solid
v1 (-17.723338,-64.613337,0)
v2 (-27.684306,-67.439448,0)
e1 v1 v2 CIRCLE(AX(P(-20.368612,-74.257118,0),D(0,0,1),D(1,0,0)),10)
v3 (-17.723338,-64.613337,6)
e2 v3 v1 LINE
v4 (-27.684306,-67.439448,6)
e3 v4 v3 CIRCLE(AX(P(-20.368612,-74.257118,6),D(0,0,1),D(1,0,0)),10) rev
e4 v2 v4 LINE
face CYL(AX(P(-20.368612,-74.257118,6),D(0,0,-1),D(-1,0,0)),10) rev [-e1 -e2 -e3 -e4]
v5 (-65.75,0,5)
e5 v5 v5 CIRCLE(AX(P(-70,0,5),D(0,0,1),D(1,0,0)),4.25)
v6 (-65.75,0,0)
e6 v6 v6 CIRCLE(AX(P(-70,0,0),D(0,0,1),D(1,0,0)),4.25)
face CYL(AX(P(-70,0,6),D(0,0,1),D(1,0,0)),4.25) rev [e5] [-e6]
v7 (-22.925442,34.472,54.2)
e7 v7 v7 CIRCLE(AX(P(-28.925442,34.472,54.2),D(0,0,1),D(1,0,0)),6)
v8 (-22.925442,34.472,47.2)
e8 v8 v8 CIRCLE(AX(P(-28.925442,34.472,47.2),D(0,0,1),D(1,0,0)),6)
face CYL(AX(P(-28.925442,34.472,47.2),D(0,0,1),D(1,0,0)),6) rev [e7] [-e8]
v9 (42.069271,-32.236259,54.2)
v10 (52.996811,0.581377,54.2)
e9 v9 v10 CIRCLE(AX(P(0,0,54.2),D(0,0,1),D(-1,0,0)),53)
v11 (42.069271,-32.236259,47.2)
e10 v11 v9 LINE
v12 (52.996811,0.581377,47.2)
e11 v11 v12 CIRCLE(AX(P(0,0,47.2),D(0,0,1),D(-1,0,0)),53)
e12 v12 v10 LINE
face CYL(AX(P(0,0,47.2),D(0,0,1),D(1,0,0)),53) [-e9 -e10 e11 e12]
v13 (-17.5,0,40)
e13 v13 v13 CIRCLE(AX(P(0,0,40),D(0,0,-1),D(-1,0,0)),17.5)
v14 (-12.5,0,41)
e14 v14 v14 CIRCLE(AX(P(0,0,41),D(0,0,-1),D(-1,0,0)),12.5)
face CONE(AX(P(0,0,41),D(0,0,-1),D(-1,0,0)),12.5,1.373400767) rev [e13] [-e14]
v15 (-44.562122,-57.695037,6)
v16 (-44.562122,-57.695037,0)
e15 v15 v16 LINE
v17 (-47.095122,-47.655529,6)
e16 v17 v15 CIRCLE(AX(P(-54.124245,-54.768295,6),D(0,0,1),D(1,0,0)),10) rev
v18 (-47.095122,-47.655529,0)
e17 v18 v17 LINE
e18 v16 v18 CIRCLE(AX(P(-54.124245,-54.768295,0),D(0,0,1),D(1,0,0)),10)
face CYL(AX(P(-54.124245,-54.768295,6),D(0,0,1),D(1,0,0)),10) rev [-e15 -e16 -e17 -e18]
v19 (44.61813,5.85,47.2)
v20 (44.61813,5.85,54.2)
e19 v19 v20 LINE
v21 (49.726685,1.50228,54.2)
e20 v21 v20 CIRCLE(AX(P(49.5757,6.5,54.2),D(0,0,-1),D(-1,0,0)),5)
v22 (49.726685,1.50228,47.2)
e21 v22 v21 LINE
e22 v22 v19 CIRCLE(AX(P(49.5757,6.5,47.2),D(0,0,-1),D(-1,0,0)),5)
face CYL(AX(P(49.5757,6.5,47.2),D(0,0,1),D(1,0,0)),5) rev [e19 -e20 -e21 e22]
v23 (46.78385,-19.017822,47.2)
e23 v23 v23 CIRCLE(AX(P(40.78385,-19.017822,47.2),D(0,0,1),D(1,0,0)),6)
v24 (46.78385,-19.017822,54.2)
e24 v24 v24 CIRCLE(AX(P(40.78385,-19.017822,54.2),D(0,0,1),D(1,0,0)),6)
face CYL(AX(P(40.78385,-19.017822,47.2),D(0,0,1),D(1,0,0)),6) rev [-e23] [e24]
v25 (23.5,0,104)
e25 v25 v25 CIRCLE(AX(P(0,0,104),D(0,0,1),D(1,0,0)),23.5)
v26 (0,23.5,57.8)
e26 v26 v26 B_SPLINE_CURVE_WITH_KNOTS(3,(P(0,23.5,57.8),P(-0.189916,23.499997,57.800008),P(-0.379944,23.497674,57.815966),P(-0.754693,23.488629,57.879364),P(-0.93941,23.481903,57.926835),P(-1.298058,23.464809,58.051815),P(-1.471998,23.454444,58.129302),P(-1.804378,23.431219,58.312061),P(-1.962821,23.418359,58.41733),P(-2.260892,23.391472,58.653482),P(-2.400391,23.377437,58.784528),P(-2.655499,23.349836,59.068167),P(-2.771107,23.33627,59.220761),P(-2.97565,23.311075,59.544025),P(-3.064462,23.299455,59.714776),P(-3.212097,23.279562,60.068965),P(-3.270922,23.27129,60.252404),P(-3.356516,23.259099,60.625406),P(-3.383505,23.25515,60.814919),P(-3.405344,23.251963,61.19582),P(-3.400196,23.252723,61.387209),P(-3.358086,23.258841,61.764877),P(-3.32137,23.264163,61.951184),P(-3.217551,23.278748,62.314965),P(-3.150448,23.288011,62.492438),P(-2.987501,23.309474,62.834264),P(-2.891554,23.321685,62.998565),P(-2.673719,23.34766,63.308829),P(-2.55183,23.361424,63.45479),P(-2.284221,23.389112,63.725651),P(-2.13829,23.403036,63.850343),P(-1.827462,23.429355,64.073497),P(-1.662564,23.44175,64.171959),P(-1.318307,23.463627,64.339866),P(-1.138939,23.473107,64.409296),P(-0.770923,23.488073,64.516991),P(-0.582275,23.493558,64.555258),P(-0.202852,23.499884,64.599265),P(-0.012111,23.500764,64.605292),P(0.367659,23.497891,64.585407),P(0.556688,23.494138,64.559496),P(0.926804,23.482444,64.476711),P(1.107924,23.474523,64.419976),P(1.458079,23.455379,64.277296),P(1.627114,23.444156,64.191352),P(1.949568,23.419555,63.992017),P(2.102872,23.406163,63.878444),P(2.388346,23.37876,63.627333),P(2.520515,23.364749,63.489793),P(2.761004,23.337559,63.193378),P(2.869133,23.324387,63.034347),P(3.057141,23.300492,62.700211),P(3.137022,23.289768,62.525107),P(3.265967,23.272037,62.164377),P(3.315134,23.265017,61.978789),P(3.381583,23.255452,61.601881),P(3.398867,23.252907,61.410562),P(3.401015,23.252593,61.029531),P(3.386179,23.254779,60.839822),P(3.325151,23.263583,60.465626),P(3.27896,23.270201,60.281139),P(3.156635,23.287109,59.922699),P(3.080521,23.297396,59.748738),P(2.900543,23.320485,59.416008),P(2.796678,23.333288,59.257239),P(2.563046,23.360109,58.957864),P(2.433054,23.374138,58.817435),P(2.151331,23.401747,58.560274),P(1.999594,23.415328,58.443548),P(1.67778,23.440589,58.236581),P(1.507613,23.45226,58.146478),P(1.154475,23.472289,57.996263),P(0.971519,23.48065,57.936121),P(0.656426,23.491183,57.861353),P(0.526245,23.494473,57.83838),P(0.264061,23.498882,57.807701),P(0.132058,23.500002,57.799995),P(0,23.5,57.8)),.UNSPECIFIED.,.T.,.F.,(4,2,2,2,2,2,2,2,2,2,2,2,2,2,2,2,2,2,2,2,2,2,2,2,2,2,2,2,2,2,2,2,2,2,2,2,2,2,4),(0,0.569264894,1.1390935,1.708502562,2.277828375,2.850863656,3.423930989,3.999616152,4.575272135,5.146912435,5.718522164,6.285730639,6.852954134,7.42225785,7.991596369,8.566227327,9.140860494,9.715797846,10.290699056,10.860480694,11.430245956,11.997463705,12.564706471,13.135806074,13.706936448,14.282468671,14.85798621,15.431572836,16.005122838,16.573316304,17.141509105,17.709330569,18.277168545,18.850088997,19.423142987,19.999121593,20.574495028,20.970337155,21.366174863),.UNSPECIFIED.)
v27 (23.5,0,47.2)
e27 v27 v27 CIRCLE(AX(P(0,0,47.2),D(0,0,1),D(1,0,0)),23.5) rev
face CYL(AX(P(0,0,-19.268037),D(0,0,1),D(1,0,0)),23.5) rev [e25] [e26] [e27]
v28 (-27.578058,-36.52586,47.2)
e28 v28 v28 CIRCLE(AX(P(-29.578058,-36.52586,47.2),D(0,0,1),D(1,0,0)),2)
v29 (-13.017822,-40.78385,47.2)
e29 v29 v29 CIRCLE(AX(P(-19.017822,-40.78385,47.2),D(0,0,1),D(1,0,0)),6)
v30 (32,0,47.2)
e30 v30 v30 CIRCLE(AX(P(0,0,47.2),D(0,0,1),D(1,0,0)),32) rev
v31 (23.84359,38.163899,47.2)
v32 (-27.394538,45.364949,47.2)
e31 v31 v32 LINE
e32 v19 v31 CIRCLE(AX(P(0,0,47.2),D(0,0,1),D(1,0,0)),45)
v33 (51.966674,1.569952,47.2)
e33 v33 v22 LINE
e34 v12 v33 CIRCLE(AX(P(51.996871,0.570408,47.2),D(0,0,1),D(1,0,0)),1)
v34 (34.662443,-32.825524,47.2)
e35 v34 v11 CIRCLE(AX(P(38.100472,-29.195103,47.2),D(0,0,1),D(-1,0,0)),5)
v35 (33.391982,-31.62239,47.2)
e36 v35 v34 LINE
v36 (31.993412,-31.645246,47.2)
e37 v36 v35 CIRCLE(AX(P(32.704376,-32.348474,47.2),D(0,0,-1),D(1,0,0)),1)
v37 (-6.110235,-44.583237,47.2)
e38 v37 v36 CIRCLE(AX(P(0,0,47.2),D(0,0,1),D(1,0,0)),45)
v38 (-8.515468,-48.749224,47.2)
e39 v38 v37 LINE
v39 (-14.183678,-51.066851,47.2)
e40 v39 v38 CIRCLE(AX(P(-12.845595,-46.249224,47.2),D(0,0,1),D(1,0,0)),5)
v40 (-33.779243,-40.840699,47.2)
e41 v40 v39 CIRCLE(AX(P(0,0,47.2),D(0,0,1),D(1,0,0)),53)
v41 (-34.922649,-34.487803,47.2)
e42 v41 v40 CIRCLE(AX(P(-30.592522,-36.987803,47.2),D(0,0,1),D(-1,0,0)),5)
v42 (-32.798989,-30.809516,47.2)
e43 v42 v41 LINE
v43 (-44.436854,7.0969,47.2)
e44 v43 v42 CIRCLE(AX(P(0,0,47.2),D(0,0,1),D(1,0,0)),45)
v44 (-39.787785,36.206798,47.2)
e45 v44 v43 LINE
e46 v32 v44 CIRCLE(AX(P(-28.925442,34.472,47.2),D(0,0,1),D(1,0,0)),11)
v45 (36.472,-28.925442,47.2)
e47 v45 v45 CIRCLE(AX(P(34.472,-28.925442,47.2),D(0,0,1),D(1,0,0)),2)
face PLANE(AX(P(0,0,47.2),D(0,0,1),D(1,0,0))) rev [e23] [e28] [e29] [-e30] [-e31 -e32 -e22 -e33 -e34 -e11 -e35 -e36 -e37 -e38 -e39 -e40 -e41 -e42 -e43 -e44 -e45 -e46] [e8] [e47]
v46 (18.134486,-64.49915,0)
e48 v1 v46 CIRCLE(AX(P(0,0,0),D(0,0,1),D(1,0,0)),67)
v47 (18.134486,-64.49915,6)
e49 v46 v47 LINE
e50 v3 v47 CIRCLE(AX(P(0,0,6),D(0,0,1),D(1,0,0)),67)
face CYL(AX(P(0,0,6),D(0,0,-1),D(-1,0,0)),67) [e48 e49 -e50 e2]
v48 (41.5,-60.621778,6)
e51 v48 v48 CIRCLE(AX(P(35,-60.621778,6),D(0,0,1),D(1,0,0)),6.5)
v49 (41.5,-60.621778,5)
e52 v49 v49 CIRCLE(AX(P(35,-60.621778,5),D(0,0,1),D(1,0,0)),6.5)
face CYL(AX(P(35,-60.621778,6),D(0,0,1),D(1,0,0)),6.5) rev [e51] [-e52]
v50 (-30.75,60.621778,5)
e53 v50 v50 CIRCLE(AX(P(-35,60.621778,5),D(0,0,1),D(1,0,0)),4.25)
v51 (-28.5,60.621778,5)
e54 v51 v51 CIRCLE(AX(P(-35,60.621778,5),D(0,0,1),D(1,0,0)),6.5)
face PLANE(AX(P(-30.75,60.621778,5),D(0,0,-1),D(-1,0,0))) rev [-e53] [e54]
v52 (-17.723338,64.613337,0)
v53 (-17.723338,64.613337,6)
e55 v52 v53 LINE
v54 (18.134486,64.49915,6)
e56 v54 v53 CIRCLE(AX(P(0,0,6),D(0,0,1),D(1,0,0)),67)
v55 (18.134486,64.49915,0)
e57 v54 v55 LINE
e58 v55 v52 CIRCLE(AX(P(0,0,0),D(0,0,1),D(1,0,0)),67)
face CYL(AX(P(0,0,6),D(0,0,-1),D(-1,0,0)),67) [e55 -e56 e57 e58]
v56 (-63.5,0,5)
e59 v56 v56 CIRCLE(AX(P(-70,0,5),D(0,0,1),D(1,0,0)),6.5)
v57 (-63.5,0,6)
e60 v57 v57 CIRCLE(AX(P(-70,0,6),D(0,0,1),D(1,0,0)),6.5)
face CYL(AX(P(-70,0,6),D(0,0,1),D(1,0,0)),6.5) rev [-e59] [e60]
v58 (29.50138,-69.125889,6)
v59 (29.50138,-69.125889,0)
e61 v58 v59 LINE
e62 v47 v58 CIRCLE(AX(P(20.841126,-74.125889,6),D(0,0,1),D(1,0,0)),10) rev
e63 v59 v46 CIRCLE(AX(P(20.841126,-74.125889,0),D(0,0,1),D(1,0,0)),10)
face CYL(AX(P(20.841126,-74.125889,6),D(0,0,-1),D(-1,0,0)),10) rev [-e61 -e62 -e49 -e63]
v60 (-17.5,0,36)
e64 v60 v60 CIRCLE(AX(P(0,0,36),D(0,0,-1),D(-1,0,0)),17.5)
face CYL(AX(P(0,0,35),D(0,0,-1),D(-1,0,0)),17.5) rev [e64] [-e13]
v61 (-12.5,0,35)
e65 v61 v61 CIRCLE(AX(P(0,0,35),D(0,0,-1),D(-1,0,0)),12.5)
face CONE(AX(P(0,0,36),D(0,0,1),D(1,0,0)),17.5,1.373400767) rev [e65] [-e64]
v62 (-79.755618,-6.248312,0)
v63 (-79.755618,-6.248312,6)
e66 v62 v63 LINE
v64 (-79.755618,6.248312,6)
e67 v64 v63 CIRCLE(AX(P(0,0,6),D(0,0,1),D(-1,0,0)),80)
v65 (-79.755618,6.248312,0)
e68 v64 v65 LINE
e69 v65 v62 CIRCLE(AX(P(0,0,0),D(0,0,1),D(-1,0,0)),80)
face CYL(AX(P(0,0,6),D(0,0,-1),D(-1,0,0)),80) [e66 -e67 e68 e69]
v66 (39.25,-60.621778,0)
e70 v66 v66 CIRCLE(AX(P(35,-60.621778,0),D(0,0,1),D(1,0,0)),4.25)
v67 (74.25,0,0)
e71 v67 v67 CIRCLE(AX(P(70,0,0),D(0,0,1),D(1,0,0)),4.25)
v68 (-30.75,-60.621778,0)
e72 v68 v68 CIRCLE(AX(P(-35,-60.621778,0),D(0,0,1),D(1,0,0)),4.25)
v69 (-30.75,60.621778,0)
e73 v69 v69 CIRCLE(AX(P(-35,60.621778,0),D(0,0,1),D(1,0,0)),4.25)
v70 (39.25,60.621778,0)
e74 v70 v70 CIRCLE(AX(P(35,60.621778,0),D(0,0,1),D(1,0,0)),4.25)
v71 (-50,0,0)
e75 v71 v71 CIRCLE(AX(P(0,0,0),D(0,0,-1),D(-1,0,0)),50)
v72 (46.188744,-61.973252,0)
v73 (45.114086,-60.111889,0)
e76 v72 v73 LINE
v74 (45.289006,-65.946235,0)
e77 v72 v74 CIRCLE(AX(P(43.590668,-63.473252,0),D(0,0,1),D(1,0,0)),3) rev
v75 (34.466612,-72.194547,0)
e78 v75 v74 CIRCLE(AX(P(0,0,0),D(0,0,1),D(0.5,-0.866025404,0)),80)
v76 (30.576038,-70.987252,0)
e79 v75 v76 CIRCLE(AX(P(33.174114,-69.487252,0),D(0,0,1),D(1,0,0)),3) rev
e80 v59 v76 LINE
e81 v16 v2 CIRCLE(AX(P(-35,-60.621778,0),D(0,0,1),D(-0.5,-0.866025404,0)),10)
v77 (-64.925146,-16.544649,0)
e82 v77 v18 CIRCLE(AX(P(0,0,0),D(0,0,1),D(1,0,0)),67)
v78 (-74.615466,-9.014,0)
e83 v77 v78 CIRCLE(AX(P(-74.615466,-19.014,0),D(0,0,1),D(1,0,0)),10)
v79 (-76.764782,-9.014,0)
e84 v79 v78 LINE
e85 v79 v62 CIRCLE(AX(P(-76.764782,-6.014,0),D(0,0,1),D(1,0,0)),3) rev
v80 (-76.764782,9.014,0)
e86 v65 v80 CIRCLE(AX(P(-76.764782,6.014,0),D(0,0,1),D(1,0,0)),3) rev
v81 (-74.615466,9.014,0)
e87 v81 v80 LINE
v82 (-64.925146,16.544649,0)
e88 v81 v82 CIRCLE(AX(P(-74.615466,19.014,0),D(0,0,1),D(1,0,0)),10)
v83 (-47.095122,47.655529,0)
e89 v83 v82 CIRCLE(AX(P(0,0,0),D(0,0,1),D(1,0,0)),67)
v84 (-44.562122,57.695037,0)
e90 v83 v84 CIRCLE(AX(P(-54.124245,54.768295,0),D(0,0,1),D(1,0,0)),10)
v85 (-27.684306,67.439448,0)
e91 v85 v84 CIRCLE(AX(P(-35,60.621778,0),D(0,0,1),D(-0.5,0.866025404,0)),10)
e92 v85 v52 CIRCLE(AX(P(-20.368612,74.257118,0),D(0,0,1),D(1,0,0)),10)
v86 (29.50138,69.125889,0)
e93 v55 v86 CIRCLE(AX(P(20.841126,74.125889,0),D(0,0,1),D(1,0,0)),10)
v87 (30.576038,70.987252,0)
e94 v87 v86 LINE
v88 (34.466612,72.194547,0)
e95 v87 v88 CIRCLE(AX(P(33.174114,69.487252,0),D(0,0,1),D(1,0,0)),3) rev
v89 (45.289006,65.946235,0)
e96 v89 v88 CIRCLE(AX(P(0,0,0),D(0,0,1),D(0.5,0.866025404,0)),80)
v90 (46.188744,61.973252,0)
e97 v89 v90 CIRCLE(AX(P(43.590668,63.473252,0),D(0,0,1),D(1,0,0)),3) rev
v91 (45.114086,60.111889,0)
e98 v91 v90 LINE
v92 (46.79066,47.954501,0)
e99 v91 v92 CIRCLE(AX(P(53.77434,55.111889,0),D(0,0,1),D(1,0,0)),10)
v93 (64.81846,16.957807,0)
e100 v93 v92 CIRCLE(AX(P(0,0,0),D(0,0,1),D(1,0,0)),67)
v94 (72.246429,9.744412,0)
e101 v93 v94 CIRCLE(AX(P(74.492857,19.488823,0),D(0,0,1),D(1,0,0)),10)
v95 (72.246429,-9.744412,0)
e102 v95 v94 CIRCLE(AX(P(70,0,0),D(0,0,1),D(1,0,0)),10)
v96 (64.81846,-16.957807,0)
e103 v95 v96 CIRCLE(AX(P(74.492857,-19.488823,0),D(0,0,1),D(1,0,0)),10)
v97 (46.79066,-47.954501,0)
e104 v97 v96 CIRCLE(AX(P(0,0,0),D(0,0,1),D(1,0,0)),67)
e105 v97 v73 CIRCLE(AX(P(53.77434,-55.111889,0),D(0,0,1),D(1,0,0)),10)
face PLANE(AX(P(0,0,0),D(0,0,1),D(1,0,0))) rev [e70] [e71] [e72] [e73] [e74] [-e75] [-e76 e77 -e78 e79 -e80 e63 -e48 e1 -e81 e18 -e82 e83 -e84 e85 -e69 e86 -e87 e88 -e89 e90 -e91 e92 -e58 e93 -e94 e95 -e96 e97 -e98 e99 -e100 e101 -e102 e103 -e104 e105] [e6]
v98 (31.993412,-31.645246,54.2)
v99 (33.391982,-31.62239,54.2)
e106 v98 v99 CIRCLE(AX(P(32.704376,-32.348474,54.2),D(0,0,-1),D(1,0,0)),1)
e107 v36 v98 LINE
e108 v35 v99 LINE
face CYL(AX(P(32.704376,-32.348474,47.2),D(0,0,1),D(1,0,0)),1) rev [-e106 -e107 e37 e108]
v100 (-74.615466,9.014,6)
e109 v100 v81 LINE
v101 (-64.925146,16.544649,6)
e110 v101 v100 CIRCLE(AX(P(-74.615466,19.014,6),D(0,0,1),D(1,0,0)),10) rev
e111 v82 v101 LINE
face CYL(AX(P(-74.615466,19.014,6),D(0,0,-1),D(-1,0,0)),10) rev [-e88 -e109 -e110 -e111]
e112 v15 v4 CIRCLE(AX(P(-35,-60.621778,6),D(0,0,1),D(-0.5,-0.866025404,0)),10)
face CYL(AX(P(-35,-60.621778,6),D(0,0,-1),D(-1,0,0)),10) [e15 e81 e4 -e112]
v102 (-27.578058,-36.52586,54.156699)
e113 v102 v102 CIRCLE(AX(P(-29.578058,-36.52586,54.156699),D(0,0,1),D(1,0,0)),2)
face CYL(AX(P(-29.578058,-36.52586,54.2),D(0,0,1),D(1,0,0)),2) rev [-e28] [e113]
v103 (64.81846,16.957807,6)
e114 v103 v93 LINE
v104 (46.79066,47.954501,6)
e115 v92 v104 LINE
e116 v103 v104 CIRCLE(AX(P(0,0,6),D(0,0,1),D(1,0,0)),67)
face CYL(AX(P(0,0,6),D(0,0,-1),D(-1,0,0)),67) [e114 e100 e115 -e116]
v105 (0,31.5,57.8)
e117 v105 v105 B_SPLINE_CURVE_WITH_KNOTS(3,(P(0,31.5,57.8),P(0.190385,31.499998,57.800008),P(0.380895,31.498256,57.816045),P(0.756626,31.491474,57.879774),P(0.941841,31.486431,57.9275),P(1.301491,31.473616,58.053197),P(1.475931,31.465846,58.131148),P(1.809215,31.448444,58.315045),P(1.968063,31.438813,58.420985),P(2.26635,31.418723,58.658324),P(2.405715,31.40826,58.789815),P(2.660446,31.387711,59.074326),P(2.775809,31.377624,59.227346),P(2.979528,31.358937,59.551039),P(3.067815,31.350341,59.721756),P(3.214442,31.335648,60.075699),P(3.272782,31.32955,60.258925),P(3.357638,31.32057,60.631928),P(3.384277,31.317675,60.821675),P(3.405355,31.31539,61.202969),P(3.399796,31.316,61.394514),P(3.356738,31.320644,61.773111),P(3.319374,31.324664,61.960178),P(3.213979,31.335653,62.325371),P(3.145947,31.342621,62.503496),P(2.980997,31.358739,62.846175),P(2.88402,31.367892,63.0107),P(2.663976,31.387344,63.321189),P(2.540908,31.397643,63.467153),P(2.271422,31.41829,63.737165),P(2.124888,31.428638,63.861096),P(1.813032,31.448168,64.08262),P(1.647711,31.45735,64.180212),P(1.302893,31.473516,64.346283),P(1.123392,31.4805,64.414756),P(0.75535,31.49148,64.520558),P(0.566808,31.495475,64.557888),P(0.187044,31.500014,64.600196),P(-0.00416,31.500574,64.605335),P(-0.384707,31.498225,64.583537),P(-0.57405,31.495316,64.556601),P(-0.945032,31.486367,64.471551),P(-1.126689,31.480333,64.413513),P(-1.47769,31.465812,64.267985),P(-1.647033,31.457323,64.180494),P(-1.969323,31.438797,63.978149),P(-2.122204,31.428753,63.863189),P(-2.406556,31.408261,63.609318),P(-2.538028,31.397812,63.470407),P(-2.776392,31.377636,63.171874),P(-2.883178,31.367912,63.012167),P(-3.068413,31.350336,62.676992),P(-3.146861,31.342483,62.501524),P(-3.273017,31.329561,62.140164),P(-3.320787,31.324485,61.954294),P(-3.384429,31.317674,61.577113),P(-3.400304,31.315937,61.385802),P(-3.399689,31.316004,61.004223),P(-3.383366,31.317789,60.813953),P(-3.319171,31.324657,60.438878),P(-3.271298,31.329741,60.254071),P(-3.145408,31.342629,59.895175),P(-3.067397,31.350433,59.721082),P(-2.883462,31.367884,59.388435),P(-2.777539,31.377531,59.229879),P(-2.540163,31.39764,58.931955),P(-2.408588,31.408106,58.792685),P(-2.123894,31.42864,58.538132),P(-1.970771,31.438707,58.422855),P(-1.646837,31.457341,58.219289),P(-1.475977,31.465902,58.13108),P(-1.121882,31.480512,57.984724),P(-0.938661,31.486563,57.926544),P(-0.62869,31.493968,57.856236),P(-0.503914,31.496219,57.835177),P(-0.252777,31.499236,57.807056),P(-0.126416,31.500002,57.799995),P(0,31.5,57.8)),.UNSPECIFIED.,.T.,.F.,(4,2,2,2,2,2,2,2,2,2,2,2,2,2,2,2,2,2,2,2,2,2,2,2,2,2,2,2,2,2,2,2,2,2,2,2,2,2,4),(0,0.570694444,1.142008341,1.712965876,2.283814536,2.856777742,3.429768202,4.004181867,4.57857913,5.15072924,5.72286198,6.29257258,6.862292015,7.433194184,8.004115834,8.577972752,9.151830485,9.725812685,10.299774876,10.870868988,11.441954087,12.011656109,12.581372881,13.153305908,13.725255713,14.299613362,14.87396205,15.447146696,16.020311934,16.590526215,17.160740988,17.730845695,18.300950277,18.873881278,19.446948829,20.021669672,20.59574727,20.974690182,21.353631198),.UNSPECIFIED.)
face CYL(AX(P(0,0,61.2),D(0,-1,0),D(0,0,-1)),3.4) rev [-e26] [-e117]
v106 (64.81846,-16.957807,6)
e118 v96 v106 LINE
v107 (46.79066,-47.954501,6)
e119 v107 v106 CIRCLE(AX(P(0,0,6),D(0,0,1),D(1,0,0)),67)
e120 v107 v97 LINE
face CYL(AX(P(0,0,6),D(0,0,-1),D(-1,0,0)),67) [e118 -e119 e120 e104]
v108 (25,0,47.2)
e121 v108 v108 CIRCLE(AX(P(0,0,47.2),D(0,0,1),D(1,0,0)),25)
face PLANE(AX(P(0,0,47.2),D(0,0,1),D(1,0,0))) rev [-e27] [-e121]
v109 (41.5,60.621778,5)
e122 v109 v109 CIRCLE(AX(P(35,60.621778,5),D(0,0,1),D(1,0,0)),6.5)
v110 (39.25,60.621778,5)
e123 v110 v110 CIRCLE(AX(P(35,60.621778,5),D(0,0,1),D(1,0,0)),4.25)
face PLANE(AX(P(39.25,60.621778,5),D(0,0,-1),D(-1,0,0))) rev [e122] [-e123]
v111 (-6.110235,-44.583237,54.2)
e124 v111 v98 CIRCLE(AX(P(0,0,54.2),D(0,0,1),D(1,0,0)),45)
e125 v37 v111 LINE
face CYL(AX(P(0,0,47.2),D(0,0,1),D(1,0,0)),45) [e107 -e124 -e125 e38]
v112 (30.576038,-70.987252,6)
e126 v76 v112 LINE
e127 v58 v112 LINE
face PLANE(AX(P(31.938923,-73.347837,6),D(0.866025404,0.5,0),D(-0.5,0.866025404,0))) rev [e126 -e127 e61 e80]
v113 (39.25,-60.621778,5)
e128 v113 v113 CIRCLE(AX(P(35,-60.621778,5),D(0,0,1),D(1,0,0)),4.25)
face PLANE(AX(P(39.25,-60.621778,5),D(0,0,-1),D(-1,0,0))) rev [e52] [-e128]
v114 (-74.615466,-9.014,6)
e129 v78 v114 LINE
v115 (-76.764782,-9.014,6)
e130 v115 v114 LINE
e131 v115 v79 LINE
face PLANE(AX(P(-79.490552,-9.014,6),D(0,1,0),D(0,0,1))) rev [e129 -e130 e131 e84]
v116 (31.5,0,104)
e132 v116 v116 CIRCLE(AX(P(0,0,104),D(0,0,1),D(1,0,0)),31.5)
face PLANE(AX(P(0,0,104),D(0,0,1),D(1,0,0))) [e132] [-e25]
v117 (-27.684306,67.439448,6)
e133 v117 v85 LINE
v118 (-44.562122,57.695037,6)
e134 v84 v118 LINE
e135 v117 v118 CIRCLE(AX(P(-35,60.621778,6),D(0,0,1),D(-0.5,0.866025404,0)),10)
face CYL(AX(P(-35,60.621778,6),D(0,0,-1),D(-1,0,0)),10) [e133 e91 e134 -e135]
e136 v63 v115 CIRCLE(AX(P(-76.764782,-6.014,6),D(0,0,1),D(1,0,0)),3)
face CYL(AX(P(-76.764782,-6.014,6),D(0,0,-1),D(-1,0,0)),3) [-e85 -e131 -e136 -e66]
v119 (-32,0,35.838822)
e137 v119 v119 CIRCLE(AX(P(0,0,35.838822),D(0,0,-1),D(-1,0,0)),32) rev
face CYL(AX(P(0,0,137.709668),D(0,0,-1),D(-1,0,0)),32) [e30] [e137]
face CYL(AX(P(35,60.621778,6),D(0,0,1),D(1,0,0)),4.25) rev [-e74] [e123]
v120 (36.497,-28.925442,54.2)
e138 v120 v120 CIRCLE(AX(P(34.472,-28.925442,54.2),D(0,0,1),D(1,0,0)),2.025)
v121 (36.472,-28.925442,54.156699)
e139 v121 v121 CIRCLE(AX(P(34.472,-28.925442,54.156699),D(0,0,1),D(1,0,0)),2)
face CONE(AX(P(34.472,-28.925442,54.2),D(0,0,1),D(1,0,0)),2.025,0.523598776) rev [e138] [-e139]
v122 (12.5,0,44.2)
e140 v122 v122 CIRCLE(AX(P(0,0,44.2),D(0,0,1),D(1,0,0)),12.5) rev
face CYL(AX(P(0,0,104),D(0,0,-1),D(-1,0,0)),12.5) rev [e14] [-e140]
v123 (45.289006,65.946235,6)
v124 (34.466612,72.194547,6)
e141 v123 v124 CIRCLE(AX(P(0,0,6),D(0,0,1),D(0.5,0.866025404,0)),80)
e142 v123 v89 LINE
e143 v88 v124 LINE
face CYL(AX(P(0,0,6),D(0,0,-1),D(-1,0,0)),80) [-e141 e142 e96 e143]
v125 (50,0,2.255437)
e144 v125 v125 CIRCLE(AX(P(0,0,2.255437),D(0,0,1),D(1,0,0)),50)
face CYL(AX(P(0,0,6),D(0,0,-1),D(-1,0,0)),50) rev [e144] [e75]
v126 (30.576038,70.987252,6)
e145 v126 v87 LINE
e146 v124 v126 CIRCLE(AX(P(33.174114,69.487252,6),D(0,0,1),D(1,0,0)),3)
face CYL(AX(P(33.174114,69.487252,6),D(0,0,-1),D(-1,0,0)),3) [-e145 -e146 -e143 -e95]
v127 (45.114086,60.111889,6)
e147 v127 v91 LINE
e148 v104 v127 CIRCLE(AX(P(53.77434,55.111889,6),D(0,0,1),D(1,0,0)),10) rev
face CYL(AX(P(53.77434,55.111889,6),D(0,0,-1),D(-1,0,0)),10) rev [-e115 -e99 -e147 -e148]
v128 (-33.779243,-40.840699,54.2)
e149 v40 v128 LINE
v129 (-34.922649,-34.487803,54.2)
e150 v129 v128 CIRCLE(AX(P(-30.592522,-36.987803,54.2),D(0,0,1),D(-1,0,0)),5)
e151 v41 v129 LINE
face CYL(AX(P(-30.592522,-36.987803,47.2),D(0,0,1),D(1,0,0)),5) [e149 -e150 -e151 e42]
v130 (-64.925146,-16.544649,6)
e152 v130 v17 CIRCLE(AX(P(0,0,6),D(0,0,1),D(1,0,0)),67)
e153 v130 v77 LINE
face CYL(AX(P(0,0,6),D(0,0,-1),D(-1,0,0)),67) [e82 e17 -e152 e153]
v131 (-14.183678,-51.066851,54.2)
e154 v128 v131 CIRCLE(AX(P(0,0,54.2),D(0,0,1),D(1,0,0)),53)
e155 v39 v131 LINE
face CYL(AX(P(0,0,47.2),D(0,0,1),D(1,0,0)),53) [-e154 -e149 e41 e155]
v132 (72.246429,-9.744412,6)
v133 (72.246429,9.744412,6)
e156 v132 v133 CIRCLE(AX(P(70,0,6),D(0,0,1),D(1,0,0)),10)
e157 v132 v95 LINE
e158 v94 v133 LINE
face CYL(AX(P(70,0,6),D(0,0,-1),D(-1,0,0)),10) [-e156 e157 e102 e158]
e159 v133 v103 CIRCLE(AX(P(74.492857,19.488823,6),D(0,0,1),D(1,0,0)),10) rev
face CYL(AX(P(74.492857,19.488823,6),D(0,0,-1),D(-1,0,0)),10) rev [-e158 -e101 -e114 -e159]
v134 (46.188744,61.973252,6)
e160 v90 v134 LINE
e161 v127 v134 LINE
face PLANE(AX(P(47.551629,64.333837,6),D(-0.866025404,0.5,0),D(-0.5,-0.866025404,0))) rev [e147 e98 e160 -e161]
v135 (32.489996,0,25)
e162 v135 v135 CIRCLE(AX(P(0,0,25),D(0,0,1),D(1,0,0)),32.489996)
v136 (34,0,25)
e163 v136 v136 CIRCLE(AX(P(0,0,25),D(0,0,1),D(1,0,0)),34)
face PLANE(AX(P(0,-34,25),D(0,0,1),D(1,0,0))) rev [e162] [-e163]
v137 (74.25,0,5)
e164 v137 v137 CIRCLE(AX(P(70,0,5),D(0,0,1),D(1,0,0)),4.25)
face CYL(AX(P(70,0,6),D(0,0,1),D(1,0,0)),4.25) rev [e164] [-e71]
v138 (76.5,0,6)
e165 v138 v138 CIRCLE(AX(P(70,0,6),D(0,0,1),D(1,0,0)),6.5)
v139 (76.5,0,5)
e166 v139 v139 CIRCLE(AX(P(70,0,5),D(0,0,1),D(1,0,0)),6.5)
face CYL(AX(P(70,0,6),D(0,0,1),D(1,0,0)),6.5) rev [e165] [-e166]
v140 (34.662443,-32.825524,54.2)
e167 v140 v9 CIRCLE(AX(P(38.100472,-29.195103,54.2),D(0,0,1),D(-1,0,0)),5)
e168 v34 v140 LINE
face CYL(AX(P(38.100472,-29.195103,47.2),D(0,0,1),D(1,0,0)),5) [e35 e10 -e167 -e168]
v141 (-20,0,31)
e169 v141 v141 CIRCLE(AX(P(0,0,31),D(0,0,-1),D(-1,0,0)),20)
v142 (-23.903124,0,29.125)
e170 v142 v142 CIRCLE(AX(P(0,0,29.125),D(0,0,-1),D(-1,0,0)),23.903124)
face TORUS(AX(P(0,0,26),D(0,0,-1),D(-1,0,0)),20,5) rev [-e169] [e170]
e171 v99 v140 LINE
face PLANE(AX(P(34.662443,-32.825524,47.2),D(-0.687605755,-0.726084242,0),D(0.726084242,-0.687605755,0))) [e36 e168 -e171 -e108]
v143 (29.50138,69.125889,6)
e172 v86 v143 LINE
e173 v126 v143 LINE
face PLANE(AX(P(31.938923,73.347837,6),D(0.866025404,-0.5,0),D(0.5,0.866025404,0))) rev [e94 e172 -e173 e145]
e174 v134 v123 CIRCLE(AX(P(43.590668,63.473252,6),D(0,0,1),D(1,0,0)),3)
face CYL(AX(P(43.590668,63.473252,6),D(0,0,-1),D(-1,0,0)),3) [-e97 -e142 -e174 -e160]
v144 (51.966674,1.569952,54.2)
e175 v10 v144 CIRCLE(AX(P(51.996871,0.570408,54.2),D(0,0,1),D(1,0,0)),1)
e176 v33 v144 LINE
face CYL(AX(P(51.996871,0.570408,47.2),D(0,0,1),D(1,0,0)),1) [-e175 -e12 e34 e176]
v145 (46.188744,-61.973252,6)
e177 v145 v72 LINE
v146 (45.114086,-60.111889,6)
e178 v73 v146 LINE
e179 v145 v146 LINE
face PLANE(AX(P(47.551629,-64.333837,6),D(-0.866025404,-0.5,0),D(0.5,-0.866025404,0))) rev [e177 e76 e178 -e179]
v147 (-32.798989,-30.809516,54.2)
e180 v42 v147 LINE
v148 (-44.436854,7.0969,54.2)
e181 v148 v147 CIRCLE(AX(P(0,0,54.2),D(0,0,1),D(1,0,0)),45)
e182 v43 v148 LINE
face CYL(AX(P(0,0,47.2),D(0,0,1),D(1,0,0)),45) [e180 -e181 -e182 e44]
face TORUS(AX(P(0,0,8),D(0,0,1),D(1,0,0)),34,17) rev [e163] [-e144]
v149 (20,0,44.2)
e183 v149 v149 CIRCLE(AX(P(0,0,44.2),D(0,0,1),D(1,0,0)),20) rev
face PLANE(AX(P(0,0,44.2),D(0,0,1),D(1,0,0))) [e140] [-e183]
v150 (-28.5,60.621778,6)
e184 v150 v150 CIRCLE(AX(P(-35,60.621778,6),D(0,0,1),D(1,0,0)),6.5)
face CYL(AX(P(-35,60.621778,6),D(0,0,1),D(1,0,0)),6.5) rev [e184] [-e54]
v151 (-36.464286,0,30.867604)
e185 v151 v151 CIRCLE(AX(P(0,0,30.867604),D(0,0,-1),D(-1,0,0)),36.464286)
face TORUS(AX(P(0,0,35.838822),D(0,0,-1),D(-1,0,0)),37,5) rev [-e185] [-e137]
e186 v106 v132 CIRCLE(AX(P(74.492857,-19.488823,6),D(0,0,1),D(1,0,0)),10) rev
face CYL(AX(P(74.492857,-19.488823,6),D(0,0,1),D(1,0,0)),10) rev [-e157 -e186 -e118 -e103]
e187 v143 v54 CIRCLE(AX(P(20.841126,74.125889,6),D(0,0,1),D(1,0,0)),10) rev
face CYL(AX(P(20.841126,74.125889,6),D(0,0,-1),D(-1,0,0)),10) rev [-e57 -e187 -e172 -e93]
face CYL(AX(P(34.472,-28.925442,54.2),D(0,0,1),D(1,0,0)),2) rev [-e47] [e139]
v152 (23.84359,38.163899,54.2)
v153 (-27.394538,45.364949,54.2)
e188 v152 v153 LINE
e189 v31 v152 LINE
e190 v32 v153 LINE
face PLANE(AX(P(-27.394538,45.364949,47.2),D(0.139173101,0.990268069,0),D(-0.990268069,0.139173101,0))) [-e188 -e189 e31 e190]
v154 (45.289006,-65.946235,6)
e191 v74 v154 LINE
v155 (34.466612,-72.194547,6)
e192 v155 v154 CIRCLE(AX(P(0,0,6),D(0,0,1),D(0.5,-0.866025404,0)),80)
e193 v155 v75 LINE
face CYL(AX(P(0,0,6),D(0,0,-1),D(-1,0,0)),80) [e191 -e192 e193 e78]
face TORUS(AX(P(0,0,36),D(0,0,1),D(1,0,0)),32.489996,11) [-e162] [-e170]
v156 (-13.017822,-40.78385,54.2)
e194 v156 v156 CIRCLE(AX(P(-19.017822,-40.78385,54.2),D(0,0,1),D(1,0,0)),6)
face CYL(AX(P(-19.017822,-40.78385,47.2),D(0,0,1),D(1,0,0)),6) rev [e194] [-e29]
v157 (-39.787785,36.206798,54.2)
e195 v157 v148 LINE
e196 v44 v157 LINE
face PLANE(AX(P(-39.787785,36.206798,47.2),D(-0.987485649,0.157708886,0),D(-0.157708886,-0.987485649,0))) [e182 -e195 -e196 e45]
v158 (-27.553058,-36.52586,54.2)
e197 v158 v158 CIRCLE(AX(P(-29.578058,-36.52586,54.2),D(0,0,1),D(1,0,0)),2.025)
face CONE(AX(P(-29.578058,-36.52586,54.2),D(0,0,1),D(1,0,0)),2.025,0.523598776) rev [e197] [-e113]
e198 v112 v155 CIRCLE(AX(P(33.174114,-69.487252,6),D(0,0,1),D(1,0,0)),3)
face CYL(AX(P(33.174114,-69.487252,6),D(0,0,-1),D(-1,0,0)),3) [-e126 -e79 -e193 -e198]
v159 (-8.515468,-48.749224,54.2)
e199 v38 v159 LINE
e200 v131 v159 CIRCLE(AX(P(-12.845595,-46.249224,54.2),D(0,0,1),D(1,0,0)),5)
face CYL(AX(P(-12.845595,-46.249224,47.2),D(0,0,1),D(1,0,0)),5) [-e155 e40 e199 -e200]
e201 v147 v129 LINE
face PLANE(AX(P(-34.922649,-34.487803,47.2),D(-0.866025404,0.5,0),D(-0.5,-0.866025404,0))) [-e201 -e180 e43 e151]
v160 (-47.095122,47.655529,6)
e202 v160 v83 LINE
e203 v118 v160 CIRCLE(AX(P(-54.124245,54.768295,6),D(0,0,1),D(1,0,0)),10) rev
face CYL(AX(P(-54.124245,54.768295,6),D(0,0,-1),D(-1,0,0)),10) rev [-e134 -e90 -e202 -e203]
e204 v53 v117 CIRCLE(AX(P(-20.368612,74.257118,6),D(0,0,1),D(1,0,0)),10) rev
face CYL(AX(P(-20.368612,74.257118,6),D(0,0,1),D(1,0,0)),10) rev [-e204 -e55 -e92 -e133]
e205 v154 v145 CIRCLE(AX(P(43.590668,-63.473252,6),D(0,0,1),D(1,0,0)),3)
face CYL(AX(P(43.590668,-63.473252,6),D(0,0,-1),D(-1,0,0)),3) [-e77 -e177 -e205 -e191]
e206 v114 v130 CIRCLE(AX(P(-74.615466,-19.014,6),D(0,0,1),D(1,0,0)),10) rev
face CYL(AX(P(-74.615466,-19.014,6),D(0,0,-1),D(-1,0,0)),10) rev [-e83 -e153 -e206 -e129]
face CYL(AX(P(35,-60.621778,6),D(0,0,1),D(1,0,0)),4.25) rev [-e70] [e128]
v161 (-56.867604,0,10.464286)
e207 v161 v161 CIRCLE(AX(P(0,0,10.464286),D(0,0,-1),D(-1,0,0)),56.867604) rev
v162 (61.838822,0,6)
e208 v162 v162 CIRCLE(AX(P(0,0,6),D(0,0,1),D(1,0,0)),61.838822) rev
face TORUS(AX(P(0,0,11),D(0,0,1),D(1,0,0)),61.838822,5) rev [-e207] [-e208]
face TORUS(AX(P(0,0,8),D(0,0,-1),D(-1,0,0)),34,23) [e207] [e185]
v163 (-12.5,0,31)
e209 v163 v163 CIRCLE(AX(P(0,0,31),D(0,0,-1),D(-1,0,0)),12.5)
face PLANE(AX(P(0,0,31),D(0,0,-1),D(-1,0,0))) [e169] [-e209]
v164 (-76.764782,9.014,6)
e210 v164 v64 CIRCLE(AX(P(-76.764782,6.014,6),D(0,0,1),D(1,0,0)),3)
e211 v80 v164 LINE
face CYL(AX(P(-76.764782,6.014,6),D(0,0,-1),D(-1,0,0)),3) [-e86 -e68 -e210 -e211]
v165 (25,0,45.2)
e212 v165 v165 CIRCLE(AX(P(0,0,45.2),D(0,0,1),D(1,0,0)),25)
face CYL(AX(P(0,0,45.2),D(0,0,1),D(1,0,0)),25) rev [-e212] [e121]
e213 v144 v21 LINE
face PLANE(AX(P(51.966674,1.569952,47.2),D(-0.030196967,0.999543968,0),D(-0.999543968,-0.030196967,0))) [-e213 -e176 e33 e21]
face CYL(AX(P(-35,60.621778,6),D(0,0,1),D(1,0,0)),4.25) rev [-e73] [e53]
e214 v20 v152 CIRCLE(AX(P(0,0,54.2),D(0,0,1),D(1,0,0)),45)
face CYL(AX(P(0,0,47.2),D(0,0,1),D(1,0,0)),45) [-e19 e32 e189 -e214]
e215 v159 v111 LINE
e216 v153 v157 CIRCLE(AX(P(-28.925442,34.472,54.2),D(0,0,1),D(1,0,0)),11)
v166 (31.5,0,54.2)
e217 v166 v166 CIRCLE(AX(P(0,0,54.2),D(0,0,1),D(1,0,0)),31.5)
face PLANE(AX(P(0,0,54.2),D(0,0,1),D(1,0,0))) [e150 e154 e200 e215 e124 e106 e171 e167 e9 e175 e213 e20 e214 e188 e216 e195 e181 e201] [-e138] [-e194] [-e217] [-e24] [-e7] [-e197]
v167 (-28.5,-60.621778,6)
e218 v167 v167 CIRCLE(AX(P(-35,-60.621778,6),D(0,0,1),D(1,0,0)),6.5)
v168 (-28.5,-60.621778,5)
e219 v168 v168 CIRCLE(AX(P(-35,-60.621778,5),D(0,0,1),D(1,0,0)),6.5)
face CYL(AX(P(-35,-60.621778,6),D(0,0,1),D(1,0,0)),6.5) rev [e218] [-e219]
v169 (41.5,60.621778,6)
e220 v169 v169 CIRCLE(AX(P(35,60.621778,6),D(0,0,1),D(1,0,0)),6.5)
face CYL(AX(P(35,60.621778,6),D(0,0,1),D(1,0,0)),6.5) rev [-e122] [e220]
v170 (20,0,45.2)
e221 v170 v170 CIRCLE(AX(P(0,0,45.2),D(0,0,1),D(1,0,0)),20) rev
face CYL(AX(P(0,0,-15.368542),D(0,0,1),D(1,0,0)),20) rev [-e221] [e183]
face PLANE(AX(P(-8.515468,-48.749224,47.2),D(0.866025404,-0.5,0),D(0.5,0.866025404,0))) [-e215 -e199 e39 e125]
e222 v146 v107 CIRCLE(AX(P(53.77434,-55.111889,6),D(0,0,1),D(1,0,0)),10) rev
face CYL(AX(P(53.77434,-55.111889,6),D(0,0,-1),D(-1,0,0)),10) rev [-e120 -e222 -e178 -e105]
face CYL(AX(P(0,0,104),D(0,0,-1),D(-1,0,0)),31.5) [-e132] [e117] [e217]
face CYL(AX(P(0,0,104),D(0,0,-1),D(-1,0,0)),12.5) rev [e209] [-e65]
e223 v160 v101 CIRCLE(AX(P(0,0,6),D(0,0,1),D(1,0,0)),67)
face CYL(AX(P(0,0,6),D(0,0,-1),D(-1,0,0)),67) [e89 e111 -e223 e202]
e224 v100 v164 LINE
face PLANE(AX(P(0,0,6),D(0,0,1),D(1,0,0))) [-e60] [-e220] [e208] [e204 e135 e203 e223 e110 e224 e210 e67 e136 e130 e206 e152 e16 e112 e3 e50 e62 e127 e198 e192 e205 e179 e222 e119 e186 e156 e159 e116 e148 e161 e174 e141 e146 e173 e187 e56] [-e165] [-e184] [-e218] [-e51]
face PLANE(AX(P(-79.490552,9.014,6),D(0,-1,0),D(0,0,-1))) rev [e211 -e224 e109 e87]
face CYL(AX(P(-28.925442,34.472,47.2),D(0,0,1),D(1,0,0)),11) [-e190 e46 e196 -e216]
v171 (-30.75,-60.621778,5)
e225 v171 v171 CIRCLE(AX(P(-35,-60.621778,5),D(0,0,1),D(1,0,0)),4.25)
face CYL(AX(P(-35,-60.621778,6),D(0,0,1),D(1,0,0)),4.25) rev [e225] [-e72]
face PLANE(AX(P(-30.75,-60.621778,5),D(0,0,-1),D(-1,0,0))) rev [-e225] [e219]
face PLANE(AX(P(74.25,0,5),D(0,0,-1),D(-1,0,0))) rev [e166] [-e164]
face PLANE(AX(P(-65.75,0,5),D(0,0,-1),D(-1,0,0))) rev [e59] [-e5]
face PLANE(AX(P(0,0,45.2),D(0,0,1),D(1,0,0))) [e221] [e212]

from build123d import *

# Parameters (mm, degrees)
SKETCH_5_R                       = 67
EXTRUDE_1_DEPTH                  = 6
SKETCH_6_R                       = 31.5
EXTRUDE_2_DEPTH                  = 104
EXTRUDE_START                    = 54.2
EXTRUDE_3_DEPTH                  = 7
SKETCH_9_R                       = 32
EXTRUDE_5_DEPTH                  = 47.2
SKETCH_11_R                      = 6
CUT_EXTRUDE_1_DEPTH              = 7
F_4_0MM_1_D                      = 4
F_4_0MM_1_DEPTH                  = 7
F_4_0MM_1_CSINK_D                = 4.05
F_4_0MM_1_CSINK_ANGLE            = 60
FILLET_1_R                       = 5
FILLET_2_R                       = 5
SKETCH_17_R                      = 10
EXTRUDE_6_DEPTH                  = 6
FILLET_3_R                       = 10
PATTERN_CIRCULAR_1_COUNT         = 3
FILLET_3_OF_PATTERN_CIRCULAR_1_R = 10
EXTRUDE_7_DEPTH                  = 6
FILLET_4_R                       = 3
FILLET_5_R                       = 10
PATTERN_CIRCULAR_2_COUNT         = 3
FILLET_4_OF_PATTERN_CIRCULAR_2_R = 3
FILLET_5_OF_PATTERN_CIRCULAR_2_R = 10
PATTERN_CIRCULAR_3_COUNT         = 6
SKETCH_23_R                      = 50
CUT_EXTRUDE_2_DEPTH              = 6
SKETCH_25_R                      = 25
CUT_EXTRUDE_3_DEPTH              = 31
FILLET_6_R                       = 5
FILLET_7_R                       = 11
SKETCH_26_R                      = 12.5
CUT_EXTRUDE_4_DEPTH              = 131.32038089
SKETCH_29_R                      = 20
CUT_EXTRUDE_5_DEPTH              = 59.8
SKETCH_30_R                      = 23.5
CUT_EXTRUDE_6_DEPTH              = 56.8
SKETCH_31_R                      = 25
CUT_EXTRUDE_7_DEPTH              = 2


with BuildPart() as part:
    # 草图5 → 凸台-拉伸1 (new body)
    with BuildSketch(Plane.XY):
        Circle(SKETCH_5_R)
    extrude(amount=EXTRUDE_1_DEPTH)

    # 草图6 → 凸台-拉伸2 (add)
    with BuildSketch(Plane.XY):
        with Locations(Location((0, 0, 0), (0, 0, 180))):
            Circle(SKETCH_6_R)
    extrude(amount=EXTRUDE_2_DEPTH)

    # 草图7 → 凸台-拉伸3 (add)
    with BuildSketch(Plane.XY.offset(EXTRUDE_START)):
        with BuildLine():
            Line((-39.787784577, 36.206797683), (-44.436854214, 7.096899856))
            ThreePointArc((-44.436854214, 7.096899856), (-43.018228491, -13.207271388), (-32.798989478, -30.809516212))
            Line((-32.798989478, -30.809516212), (-34.922649382, -34.487803064))
            ThreePointArc((-34.922649382, -34.487803064), (-35.513454562, -37.873481496), (-33.779243442, -40.840699216))
            ThreePointArc((-33.779243442, -40.840699216), (-24.520481343, -46.986657624), (-14.183678068, -51.066851053))
            ThreePointArc((-14.183678068, -51.066851053), (-10.953260337, -50.877297562), (-8.515468213, -48.749223595))
            Line((-8.515468213, -48.749223595), (-6.110234792, -44.583237105))
            ThreePointArc((-6.110234792, -44.583237105), (14.468331289, -42.610648783), (31.993411519, -31.645246394))
            ThreePointArc((31.993411519, -31.645246394), (32.688035611, -31.348607609), (33.391981974, -31.62238985))
            Line((33.391981974, -31.62238985), (34.662443446, -32.825523824))
            ThreePointArc((34.662443446, -32.825523824), (38.497004093, -34.17935406), (42.069271409, -32.236259137))
            ThreePointArc((42.069271409, -32.236259137), (50.285577783, -16.743974051), (52.996811228, 0.581377341))
            ThreePointArc((52.996811228, 0.581377341), (52.689273181, 1.291920095), (51.966674427, 1.569951925))
            Line((51.966674427, 1.569951925), (49.72668453, 1.502280162))
            ThreePointArc((49.72668453, 1.502280162), (46.335100658, 2.692308062), (44.618129723, 5.85))
            ThreePointArc((44.618129723, 5.85), (37.852328733, 24.335184599), (23.843590015, 38.163899371))
            Line((23.843590015, 38.163899371), (-27.394538325, 45.364948697))
            ThreePointArc((-27.394538325, 45.364948697), (-35.462786425, 43.318645269), (-39.787784577, 36.206797683))
        make_face()
    extrude(amount=-EXTRUDE_3_DEPTH)

    # 草图9 → 凸台-拉伸5 (add)
    with BuildSketch(Plane.XY):
        Circle(SKETCH_9_R)
    extrude(amount=EXTRUDE_5_DEPTH)

    # 草图11 → 切除-拉伸1 (cut)
    with BuildSketch(Plane.XY.offset(54.2)):
        with Locations((-28.925442436, 34.47199994)):
            Circle(SKETCH_11_R)
        with Locations((40.783850417, -19.017821778)):
            Circle(SKETCH_11_R)
        with Locations((-19.017821778, -40.783850417)):
            Circle(SKETCH_11_R)
    extrude(amount=-CUT_EXTRUDE_1_DEPTH, mode=Mode.SUBTRACT)

    # Ø4.0mm 暗销孔1
    with Locations(Plane.XY.offset(54.2)):
        with Locations((-29.578058379, -36.525860188), (34.47199994, -28.925442436)):
            CounterSinkHole(F_4_0MM_1_D / 2, F_4_0MM_1_CSINK_D / 2, depth=F_4_0MM_1_DEPTH, counter_sink_angle=F_4_0MM_1_CSINK_ANGLE)

    # 草图15 → 旋转1 (revolve)
    with BuildSketch(Plane(origin=(0, 0, 0), x_dir=(1, 0, 0), z_dir=(0, 1, 0)), mode=Mode.PRIVATE) as revolve_1_sk:
        with BuildLine():
            Line((11.087121525, -6), (56.912878475, -6))
            ThreePointArc((56.912878475, -6), (34, -31), (11.087121525, -6))
        make_face()
    revolve(revolve_1_sk.sketch.rotate(Axis((0, 0, 0), (0, 0, 1)), 180), axis=Axis((0, 0, 0), (0, 0, 1)))

    # 圆角1
    fillet_1_edges = [part.edges().sort_by_distance(p)[0] for p in [
        (56.912878475, 0, 6),
    ]]
    fillet(fillet_1_edges, radius=FILLET_1_R)

    # 圆角2
    fillet_2_edges = [part.edges().sort_by_distance(p)[0] for p in [
        (0, -32, 30.912878475),
    ]]
    fillet(fillet_2_edges, radius=FILLET_2_R)

    # 草图17 → 凸台-拉伸6 (add)
    with BuildSketch(Plane.XY):
        with Locations((70, 0)):
            Circle(SKETCH_17_R)
    extrude_6 = extrude(amount=EXTRUDE_6_DEPTH)

    # 圆角3
    fillet_3_edges = [part.edges().sort_by_distance(p)[0] for p in [
        (66.35, -9.310075188, 3),
        (66.35, 9.310075188, 3),
    ]]
    fillet(fillet_3_edges, radius=FILLET_3_R)

    # 草图19 → 孔1 (revolve, cut)
    with BuildSketch(Plane(origin=(70, 0, 6), x_dir=(0, -1, 0), z_dir=(1, 0, 0))):
        Polygon((0, 0), (0, 8.553657631), (4.25, 6), (4.25, 1), (6.5, 1), (6.5, 0), align=None)
    hole_wizard_1 = revolve(axis=Axis((70, 0, 17.310875039), (0, 0, -1)), mode=Mode.SUBTRACT)

    # 阵列(圆周)1: 凸台-拉伸6, 孔1 ×3 about axis
    pattern_circular_1_axis = Axis((0, 0, 0), (0, 0, 1))
    add([extrude_6.rotate(pattern_circular_1_axis, i * 360 / PATTERN_CIRCULAR_1_COUNT) for i in range(1, PATTERN_CIRCULAR_1_COUNT)])
    add([hole_wizard_1.rotate(pattern_circular_1_axis, i * 360 / PATTERN_CIRCULAR_1_COUNT) for i in range(1, PATTERN_CIRCULAR_1_COUNT)], mode=Mode.SUBTRACT)

    # 圆角3 of 阵列(圆周)1
    fillet_3_of_pattern_circular_1_edges = [part.edges().sort_by_distance(p)[0] for p in [
        (-25.112238376, 62.115823135, 3),
        (-41.237761624, 52.805747947, 3),
        (-41.237761624, -52.805747947, 3),
        (-25.112238376, -62.115823135, 3),
    ]]
    fillet(fillet_3_of_pattern_circular_1_edges, radius=FILLET_3_OF_PATTERN_CIRCULAR_1_R)

    # 草图20 → 凸台-拉伸7 (add)
    with BuildSketch(Plane.XY):
        with BuildLine():
            Line((-79.490551665, -9.014), (-66.390871391, -9.014))
            ThreePointArc((-66.390871391, -9.014), (-67, 0), (-66.390871391, 9.014))
            Line((-66.390871391, 9.014), (-79.490551665, 9.014))
            ThreePointArc((-79.490551665, 9.014), (-80, 0), (-79.490551665, -9.014))
        make_face()
    extrude_7 = extrude(amount=EXTRUDE_7_DEPTH)

    # 圆角4
    fillet_4_edges = [part.edges().sort_by_distance(p)[0] for p in [
        (-79.490551665, 9.014, 3),
        (-79.490551665, -9.014, 3),
    ]]
    fillet(fillet_4_edges, radius=FILLET_4_R)

    # 圆角5
    fillet_5_edges = [part.edges().sort_by_distance(p)[0] for p in [
        (-66.390871391, -9.014, 3),
        (-66.390871391, 9.014, 3),
    ]]
    fillet(fillet_5_edges, radius=FILLET_5_R)

    # 阵列(圆周)2: 凸台-拉伸7 ×3 about axis
    pattern_circular_2_axis = Axis((0, 0, 0), (0, 0, 1))
    for i in range(1, PATTERN_CIRCULAR_2_COUNT):
        add(extrude_7.rotate(pattern_circular_2_axis, i * 360 / PATTERN_CIRCULAR_2_COUNT))

    # 圆角4 of 阵列(圆周)2
    fillet_4_of_pattern_circular_2_edges = [part.edges().sort_by_distance(p)[0] for p in [
        (31.938922843, -73.347837103, 3),
        (47.551628822, -64.333837103, 3),
        (47.551628822, 64.333837103, 3),
        (31.938922843, 73.347837103, 3),
    ]]
    fillet(fillet_4_of_pattern_circular_2_edges, radius=FILLET_4_OF_PATTERN_CIRCULAR_2_R)

    # 圆角5 of 阵列(圆周)2
    fillet_5_of_pattern_circular_2_edges = [part.edges().sort_by_distance(p)[0] for p in [
        (41.001788685, -52.989181204, 3),
        (25.389082706, -62.003181204, 3),
        (25.389082706, 62.003181204, 3),
        (41.001788685, 52.989181204, 3),
    ]]
    fillet(fillet_5_of_pattern_circular_2_edges, radius=FILLET_5_OF_PATTERN_CIRCULAR_2_R)

    # 阵列(圆周)3: 孔1 ×6 about axis
    pattern_circular_3_axis = Axis((0, 0, 0), (0, 0, 1))
    for i in range(1, PATTERN_CIRCULAR_3_COUNT):
        add(hole_wizard_1.rotate(pattern_circular_3_axis, i * 360 / PATTERN_CIRCULAR_3_COUNT), mode=Mode.SUBTRACT)

    # 草图23 → 切除-拉伸2 (cut)
    with BuildSketch(Plane(origin=(0, 0, 0), x_dir=(-1, 0, 0), z_dir=(0, 0, -1))):
        Circle(SKETCH_23_R)
    extrude(amount=-CUT_EXTRUDE_2_DEPTH, mode=Mode.SUBTRACT)

    # 草图24 → 切除-旋转1 (revolve, cut)
    with BuildSketch(Plane(origin=(0, 0, 0), x_dir=(0, 0, -1), z_dir=(1, 0, 0)), mode=Mode.PRIVATE) as cut_revolve_1_sk:
        with BuildLine():
            Line((-25, -34), (-25, 0))
            Line((-25, 0), (0, 0))
            Line((0, 0), (0, -19))
            ThreePointArc((0, -19), (0.746427842, -48.577379737), (-25, -34))
        make_face()
    revolve(cut_revolve_1_sk.sketch.rotate(Axis((0, 0, 0), (0, 0, -1)), 90), axis=Axis((0, 0, 0), (0, 0, -1)), mode=Mode.SUBTRACT)

    # 草图25 → 切除-拉伸3 (cut)
    with BuildSketch(Plane(origin=(0, 0, 0), x_dir=(-1, 0, 0), z_dir=(0, 0, -1))):
        Circle(SKETCH_25_R)
    extrude(amount=-CUT_EXTRUDE_3_DEPTH, mode=Mode.SUBTRACT)

    # 圆角6
    fillet_6_edges = [part.edges().sort_by_distance(p)[0] for p in [
        (25, 0, 31),
    ]]
    fillet(fillet_6_edges, radius=FILLET_6_R)

    # 圆角7
    fillet_7_edges = [part.edges().sort_by_distance(p)[0] for p in [
        (25, 0, 25),
    ]]
    fillet(fillet_7_edges, radius=FILLET_7_R)

    # 草图26 → 切除-拉伸4 (cut, through all)
    with BuildSketch(Plane(origin=(0, 0, 31), x_dir=(-1, 0, 0), z_dir=(0, 0, -1))):
        Circle(SKETCH_26_R)
    extrude(amount=-CUT_EXTRUDE_4_DEPTH, mode=Mode.SUBTRACT)

    # 草图28 → 切除-旋转2 (revolve, cut)
    with BuildSketch(Plane(origin=(0, 0, 0), x_dir=(1, 0, 0), z_dir=(0, 1, 0)), mode=Mode.PRIVATE) as cut_revolve_2_sk:
        Polygon((0, -35), (12.5, -35), (17.5, -36), (17.5, -40), (12.5, -41), (0, -41), align=None)
    revolve(cut_revolve_2_sk.sketch.rotate(Axis((0, 0, 35), (0, 0, 1)), 180), axis=Axis((0, 0, 35), (0, 0, 1)), mode=Mode.SUBTRACT)

    # 草图29 → 切除-拉伸5 (cut)
    with BuildSketch(Plane.XY.offset(104)):
        Circle(SKETCH_29_R)
    extrude(amount=-CUT_EXTRUDE_5_DEPTH, mode=Mode.SUBTRACT)

    # 草图30 → 切除-拉伸6 (cut)
    with BuildSketch(Plane.XY.offset(104)):
        Circle(SKETCH_30_R)
    extrude(amount=-CUT_EXTRUDE_6_DEPTH, mode=Mode.SUBTRACT)

    # 草图31 → 切除-拉伸7 (cut)
    with BuildSketch(Plane.XY.offset(47.2)):
        Circle(SKETCH_31_R)
    extrude(amount=-CUT_EXTRUDE_7_DEPTH, mode=Mode.SUBTRACT)

    # 草图36 → M8 螺纹孔1 (revolve, cut)
    with BuildSketch(Plane(origin=(0, 0, 61.2), x_dir=(0, 0, -1), z_dir=(1, 0, 0))):
        Polygon((0, 0), (0, 72.487251602), (3.4, 72.487251602), (3.4, 0.625), (4.025, 0), align=None)
    revolve(axis=Axis((0, -6.35, 61.2), (0, 1, 0)), mode=Mode.SUBTRACT)


solid = part.part
